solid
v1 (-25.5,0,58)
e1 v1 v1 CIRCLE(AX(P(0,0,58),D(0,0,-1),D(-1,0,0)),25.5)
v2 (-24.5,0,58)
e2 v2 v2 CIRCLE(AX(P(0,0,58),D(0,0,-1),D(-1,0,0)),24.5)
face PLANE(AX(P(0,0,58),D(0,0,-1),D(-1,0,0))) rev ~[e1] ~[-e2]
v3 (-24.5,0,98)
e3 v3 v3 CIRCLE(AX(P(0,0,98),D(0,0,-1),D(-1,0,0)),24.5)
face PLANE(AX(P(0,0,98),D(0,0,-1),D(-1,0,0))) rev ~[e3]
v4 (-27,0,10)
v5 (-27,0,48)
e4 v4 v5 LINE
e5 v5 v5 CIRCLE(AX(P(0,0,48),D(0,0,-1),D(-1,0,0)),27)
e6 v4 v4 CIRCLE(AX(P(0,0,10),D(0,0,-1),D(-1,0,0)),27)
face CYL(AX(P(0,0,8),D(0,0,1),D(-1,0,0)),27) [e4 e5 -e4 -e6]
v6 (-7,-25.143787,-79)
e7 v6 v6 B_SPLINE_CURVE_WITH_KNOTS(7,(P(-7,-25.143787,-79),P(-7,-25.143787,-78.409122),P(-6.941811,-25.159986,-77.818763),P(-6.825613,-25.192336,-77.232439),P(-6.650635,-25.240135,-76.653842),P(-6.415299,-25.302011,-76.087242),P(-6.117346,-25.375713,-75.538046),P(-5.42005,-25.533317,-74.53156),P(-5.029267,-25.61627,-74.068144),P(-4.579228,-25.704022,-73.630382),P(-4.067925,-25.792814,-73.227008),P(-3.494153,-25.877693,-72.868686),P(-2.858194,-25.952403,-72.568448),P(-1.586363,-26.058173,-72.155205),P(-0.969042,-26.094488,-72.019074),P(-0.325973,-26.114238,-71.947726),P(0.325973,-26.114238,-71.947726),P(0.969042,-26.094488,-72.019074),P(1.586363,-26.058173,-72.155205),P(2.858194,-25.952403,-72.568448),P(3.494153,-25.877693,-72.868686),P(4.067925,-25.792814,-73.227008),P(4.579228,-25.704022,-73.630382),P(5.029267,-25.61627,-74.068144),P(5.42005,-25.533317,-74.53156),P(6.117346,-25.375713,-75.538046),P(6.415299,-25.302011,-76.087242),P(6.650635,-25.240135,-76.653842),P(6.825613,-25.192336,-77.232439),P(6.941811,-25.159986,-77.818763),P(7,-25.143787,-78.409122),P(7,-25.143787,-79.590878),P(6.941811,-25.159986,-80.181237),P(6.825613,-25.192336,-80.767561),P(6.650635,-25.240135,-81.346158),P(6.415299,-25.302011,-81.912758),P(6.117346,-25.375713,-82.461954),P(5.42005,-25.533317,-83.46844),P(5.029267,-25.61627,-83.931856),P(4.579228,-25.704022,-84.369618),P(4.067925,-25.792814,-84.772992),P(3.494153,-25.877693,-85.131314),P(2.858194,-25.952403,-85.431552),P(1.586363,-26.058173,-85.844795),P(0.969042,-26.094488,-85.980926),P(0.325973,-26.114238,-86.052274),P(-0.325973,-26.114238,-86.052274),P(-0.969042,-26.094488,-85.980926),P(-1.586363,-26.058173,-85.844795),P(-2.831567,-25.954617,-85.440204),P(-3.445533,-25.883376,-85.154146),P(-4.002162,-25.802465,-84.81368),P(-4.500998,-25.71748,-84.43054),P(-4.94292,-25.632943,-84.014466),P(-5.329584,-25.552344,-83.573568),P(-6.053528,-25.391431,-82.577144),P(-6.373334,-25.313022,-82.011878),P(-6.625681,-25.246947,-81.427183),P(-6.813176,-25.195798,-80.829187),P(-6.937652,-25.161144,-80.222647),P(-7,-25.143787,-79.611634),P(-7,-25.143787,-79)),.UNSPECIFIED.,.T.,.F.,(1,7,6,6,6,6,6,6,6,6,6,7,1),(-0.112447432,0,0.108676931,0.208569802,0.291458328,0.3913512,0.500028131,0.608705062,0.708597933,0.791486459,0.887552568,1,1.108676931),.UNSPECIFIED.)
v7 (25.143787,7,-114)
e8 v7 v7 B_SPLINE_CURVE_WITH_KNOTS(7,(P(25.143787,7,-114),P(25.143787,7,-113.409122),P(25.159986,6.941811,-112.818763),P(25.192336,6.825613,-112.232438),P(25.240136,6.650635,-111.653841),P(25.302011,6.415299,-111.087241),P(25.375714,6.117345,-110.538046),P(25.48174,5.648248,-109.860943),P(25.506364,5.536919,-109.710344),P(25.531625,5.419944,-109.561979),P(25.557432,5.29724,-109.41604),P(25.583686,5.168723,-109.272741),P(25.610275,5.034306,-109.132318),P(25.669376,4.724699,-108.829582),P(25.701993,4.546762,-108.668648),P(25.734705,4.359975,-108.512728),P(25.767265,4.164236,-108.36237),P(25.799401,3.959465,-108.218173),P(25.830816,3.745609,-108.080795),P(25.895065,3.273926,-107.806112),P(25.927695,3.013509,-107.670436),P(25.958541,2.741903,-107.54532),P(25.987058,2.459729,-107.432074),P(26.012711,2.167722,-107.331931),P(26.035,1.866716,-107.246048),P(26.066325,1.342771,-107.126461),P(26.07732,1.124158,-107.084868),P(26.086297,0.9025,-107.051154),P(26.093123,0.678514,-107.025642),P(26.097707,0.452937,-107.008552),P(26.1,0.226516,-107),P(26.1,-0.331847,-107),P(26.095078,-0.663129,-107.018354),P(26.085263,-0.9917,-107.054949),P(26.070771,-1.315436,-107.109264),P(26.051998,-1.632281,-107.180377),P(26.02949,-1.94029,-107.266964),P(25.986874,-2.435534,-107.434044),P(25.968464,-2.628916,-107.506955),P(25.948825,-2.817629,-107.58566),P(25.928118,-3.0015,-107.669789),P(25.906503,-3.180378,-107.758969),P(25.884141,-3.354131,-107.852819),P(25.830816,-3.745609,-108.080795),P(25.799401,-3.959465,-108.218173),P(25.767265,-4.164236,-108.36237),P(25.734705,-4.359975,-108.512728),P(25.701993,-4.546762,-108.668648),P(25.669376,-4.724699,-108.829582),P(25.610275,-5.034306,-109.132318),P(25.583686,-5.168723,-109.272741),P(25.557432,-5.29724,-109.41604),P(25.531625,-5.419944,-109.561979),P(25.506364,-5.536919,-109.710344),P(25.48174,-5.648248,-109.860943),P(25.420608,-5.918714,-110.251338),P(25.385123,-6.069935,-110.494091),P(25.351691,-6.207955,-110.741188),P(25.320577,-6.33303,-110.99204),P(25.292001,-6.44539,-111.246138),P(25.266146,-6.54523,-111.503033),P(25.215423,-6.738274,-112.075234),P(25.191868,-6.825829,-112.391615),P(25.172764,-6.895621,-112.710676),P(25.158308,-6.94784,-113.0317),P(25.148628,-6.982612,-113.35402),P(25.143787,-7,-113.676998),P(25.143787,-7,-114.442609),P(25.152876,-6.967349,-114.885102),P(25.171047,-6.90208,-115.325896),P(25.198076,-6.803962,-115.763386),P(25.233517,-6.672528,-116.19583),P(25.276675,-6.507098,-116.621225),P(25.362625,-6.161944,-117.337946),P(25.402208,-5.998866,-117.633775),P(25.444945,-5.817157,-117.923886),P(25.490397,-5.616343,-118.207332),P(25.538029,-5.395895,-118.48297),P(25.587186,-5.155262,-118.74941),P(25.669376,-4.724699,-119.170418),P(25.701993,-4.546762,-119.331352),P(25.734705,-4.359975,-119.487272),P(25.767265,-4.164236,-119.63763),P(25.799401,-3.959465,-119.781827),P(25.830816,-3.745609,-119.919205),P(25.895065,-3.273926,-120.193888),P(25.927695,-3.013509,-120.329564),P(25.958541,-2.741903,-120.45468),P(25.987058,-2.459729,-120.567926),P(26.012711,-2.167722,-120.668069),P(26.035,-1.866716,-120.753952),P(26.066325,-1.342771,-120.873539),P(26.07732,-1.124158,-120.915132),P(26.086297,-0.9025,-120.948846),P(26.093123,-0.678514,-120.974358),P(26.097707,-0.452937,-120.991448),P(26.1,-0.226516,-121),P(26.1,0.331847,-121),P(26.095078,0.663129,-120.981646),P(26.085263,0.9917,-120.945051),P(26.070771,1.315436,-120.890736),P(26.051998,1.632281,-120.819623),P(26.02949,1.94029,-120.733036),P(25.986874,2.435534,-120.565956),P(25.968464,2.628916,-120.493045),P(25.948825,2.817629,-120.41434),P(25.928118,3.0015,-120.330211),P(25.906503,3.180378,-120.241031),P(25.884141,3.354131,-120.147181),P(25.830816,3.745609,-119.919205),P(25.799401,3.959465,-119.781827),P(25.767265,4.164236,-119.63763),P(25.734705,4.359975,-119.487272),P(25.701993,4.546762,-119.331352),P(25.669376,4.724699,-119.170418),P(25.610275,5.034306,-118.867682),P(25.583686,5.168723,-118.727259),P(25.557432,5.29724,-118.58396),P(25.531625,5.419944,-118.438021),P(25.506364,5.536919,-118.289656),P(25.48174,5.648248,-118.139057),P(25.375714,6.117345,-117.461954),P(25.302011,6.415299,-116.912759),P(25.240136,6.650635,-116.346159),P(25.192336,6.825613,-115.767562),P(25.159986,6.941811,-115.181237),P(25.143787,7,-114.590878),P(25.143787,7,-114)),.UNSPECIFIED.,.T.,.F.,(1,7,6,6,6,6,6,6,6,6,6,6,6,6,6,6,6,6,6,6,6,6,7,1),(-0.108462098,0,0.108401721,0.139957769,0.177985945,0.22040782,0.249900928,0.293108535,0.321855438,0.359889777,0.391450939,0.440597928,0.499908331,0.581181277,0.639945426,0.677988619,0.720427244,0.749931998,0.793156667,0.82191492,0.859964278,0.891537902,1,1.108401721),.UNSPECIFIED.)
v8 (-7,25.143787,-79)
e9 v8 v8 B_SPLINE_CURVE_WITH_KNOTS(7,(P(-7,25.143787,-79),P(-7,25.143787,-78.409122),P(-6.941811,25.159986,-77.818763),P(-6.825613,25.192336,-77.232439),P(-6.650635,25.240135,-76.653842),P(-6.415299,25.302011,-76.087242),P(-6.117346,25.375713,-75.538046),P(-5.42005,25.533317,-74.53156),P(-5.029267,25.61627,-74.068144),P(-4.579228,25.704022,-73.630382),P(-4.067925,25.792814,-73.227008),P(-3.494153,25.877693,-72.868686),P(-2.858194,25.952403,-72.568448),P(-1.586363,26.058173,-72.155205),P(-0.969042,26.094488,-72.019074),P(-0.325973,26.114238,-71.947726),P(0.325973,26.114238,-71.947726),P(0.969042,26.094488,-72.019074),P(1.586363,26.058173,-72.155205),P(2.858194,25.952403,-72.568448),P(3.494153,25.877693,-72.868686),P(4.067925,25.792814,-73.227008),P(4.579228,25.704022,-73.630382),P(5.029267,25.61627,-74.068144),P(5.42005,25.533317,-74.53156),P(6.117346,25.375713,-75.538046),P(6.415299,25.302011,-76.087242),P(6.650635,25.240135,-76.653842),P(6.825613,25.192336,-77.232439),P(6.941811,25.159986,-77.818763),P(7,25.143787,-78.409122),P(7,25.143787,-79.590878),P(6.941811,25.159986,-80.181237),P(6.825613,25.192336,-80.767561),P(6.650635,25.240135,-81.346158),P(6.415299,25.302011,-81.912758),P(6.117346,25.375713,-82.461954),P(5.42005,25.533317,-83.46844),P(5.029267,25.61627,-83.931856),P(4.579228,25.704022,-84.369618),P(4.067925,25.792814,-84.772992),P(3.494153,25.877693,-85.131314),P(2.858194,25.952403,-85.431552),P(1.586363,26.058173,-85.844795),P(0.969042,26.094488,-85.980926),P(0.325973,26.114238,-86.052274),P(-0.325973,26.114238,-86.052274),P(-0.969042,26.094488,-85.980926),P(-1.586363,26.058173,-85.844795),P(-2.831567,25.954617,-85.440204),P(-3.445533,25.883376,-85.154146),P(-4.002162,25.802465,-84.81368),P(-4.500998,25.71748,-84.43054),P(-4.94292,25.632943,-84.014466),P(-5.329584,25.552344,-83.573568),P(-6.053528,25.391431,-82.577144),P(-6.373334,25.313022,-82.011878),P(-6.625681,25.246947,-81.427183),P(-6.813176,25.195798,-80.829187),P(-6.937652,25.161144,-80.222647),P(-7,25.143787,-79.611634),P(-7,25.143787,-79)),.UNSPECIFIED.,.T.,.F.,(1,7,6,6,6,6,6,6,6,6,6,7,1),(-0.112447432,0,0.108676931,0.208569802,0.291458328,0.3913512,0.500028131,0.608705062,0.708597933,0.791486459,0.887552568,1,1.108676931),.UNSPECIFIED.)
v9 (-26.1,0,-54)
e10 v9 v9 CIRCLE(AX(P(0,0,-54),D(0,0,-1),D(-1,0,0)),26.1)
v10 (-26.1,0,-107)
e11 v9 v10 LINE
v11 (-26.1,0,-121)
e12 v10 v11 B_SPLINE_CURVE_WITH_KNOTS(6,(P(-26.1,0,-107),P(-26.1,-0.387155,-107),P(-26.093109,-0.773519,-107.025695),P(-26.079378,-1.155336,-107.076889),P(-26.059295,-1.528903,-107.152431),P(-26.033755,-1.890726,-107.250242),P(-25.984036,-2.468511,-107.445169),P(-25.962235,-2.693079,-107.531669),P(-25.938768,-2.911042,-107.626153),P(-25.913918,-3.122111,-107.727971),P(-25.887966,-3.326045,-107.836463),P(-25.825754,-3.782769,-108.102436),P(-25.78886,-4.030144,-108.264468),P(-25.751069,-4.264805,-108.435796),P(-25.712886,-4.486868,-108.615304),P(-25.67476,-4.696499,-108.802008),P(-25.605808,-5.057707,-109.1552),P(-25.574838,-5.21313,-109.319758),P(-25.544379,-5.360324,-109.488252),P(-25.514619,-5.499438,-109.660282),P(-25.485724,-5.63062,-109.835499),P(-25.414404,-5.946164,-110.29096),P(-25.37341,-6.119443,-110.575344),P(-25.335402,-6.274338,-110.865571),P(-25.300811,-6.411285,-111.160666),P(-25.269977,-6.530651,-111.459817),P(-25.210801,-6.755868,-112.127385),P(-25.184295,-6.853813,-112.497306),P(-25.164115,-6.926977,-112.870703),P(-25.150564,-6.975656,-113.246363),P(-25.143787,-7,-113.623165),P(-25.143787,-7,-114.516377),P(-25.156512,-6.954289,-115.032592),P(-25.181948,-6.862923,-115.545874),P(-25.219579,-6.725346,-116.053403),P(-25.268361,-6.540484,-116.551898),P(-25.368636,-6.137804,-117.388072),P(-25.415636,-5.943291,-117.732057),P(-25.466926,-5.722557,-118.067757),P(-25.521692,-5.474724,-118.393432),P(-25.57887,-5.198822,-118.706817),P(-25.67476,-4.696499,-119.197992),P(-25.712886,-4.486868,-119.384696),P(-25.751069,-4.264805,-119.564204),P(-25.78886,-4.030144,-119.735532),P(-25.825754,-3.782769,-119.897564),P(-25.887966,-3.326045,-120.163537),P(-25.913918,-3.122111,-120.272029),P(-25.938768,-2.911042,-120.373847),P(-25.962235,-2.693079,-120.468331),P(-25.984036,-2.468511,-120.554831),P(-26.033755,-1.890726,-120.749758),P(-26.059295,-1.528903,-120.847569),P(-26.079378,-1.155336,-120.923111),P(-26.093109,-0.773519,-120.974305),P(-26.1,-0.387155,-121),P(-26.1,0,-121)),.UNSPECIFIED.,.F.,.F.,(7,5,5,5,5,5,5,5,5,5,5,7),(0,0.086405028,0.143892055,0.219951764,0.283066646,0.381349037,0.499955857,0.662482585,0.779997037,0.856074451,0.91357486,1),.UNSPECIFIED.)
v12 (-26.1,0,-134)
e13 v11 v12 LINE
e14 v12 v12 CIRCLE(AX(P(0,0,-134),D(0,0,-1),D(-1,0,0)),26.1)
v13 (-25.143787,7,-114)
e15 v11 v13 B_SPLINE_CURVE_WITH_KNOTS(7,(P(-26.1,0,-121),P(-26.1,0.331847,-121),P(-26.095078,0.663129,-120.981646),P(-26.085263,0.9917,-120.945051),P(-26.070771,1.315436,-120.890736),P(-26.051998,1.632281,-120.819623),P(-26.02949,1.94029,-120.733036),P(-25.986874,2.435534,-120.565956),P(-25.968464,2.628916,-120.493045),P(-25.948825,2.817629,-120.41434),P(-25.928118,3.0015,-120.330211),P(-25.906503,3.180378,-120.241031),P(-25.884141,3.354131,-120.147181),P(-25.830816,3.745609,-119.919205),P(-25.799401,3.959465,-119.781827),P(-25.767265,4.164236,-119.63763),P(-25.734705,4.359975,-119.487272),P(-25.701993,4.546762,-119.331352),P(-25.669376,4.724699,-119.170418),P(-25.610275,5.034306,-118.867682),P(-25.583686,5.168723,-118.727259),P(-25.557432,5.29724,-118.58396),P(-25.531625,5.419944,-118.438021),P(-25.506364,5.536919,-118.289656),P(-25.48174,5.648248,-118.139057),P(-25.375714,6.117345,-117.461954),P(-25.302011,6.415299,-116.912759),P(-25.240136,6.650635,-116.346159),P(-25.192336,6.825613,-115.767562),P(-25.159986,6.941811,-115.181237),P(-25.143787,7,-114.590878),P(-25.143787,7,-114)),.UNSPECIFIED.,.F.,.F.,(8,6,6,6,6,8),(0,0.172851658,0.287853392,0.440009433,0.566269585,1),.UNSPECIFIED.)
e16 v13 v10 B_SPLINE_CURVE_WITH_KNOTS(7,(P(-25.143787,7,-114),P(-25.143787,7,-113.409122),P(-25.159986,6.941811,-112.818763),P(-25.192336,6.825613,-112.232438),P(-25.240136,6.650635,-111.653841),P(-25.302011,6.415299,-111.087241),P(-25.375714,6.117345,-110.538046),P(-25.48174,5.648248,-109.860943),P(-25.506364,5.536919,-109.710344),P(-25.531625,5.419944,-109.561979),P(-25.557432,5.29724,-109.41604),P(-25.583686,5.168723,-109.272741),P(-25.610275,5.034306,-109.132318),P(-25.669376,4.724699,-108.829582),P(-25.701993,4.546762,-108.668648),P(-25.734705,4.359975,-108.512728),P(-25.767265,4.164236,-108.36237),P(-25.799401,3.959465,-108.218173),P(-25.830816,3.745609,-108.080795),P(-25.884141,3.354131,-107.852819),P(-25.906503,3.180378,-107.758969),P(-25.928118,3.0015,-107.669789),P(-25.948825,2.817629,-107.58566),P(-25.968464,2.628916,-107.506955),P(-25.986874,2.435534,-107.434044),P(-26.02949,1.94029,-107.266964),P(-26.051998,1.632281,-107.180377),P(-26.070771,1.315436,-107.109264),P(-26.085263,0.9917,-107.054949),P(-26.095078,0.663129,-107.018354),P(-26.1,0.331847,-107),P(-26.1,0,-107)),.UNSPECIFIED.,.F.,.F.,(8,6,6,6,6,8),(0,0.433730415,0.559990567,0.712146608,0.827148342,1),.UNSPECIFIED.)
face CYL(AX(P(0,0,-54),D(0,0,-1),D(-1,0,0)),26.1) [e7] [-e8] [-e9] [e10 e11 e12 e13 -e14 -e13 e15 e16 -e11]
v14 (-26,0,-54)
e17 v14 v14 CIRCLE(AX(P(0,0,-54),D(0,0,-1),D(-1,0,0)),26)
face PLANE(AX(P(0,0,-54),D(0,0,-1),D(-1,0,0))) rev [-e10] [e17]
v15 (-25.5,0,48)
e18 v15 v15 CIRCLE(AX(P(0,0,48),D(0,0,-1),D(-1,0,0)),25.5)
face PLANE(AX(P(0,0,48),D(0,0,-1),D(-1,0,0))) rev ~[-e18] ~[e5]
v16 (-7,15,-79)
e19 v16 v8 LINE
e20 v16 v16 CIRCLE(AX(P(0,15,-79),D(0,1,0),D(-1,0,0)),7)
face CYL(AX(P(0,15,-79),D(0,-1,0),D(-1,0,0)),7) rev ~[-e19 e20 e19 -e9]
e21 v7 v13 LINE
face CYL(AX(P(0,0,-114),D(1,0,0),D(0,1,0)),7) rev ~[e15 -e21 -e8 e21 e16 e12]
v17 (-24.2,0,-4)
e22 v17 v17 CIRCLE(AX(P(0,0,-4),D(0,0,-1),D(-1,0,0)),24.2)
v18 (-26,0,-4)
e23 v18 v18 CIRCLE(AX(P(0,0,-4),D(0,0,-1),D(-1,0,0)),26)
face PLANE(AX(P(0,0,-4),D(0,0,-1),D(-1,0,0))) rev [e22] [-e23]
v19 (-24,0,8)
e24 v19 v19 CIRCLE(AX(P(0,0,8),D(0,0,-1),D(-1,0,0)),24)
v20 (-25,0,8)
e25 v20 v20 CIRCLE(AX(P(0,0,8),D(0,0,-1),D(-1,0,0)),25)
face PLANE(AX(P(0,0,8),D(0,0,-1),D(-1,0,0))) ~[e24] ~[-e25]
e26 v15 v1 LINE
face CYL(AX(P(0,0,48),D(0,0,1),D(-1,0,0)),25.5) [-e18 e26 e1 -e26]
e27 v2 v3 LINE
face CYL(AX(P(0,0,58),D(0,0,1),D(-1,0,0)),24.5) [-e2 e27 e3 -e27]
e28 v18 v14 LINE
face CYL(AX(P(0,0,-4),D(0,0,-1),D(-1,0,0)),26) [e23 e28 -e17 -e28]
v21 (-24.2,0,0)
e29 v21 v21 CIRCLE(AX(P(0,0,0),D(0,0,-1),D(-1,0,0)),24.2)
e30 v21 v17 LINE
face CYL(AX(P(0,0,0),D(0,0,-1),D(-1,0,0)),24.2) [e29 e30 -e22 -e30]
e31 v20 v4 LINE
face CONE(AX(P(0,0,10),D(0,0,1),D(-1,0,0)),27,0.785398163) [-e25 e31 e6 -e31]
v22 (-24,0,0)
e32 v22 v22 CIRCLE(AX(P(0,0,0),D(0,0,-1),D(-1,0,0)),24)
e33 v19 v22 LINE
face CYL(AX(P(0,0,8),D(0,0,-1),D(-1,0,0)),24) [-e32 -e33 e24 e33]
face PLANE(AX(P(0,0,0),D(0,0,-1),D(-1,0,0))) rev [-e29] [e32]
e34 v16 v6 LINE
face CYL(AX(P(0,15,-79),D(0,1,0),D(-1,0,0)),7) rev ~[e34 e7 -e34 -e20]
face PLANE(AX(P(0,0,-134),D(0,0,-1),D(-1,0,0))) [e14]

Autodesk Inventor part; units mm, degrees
ref_plane "YZ Plane" through (0, 0, 0) normal (1, 0, 0) x (0, 1, 0)
ref_plane "XY Plane" through (0, 0, 0) normal (0, 0, 1) x (1, 0, 0)
sketch "Sketch1" plane through (0, 0, 0) normal (0, 1, 0) x (-1, 0, 0)
  line L0 (24, 8) -> (27, 8)
  line L1 (27, 8) -> (27, 48)
  line L2 (27, 48) -> (25.5, 48)
  line L3 (25.5, 48) -> (25.5, 58)
  line L4 (26, 208) -> (25, 208)
  line L5 (25, 248) -> (25, 248)
  line L6 (0, 138) -> (0, -122.7414) construction
  line L7 (24, 8) -> (24, 0)
  line L8 (0, 98) -> (0, 0)
  line L9 (24, 0) -> (24.2, 0)
  line L10 (24.2, 0) -> (24.2, -4)
  line L11 (24.2, -4) -> (26, -4)
  line L12 (26, -4) -> (26, -54)
  line L13 (26, -54) -> (26.1, -54)
  line L14 (26.1, -54) -> (26.1, -134)
  line L15 (26.1, -134) -> (0, -134)
  line L16 (0, 0) -> (0, -134)
  line L17 (24, 0) -> (24.2, 0)
  line L18 (25.5, 58) -> (24.5, 58)
  line L19 (24.5, 58) -> (24.5, 98)
  line L20 (24.5, 98) -> (0, 98)
  dimension "d2" = 40
  dimension "d4" = 8
  dimension "d16" = 10
  dimension "d71" = 27
  dimension "d78" = 24
  dimension "d82" = 4
  dimension "d83" = 50
  dimension "d84" = 24.2
  dimension "d85" = 26.1
  dimension "d86" = 80
  dimension "d88" = 25.5
  dimension "d89" = 26
  dimension "d90" = 40
  dimension "d92" = 24.5
ref_plane "Work Plane1" through (0, 15, 0) normal (0, 1, 0) x (-1, 0, 0)
sketch "Sketch3" plane through (0, 15, 0) normal (0, 1, 0) x (-1, 0, 0)
  circle A0 centre (0, -79) radius 7
  point P0 (0, 0)
  dimension "d22" = 14
  dimension "d66" = 79
sketch "Sketch4" plane through (0, 0, 0) normal (1, 0, 0) x (0, 1, 0)
  circle A0 centre (0, -114) radius 7
  point P0 (0, 0)
  dimension "d28" = 14
  dimension "d67" = 114
revolve "Revolution1" add sketch "Sketch1" angle 360 about axis through (0, 0, 98) along (0, 0, -1)
extrude "Extrusion5" cut sketch "Sketch3" along normal blind 20 and the other way blind 45
extrude "Extrusion6" cut sketch "Sketch4" along normal blind 35 and the other way blind 30
chamfer "Chamfer3" distance 2 angle 45 1 edges at (27, 0, 8)
sketch "Sketch5" plane through (0, 0, 0) normal (0, 1, 0) x (-1, 0, 0)
  line L0 (24, 8) -> (24, 0) projected
  point P0 (0, 0)
sketch "Sketch6" plane through (0, 0, 0) normal (1, 0, 0) x (0, 1, 0)
  line L0 (0, 0) -> (-46.2751, 0) construction
equation "\"DiametroInterior\" = 52.2"
properties part number "Mangon_Conducido"
